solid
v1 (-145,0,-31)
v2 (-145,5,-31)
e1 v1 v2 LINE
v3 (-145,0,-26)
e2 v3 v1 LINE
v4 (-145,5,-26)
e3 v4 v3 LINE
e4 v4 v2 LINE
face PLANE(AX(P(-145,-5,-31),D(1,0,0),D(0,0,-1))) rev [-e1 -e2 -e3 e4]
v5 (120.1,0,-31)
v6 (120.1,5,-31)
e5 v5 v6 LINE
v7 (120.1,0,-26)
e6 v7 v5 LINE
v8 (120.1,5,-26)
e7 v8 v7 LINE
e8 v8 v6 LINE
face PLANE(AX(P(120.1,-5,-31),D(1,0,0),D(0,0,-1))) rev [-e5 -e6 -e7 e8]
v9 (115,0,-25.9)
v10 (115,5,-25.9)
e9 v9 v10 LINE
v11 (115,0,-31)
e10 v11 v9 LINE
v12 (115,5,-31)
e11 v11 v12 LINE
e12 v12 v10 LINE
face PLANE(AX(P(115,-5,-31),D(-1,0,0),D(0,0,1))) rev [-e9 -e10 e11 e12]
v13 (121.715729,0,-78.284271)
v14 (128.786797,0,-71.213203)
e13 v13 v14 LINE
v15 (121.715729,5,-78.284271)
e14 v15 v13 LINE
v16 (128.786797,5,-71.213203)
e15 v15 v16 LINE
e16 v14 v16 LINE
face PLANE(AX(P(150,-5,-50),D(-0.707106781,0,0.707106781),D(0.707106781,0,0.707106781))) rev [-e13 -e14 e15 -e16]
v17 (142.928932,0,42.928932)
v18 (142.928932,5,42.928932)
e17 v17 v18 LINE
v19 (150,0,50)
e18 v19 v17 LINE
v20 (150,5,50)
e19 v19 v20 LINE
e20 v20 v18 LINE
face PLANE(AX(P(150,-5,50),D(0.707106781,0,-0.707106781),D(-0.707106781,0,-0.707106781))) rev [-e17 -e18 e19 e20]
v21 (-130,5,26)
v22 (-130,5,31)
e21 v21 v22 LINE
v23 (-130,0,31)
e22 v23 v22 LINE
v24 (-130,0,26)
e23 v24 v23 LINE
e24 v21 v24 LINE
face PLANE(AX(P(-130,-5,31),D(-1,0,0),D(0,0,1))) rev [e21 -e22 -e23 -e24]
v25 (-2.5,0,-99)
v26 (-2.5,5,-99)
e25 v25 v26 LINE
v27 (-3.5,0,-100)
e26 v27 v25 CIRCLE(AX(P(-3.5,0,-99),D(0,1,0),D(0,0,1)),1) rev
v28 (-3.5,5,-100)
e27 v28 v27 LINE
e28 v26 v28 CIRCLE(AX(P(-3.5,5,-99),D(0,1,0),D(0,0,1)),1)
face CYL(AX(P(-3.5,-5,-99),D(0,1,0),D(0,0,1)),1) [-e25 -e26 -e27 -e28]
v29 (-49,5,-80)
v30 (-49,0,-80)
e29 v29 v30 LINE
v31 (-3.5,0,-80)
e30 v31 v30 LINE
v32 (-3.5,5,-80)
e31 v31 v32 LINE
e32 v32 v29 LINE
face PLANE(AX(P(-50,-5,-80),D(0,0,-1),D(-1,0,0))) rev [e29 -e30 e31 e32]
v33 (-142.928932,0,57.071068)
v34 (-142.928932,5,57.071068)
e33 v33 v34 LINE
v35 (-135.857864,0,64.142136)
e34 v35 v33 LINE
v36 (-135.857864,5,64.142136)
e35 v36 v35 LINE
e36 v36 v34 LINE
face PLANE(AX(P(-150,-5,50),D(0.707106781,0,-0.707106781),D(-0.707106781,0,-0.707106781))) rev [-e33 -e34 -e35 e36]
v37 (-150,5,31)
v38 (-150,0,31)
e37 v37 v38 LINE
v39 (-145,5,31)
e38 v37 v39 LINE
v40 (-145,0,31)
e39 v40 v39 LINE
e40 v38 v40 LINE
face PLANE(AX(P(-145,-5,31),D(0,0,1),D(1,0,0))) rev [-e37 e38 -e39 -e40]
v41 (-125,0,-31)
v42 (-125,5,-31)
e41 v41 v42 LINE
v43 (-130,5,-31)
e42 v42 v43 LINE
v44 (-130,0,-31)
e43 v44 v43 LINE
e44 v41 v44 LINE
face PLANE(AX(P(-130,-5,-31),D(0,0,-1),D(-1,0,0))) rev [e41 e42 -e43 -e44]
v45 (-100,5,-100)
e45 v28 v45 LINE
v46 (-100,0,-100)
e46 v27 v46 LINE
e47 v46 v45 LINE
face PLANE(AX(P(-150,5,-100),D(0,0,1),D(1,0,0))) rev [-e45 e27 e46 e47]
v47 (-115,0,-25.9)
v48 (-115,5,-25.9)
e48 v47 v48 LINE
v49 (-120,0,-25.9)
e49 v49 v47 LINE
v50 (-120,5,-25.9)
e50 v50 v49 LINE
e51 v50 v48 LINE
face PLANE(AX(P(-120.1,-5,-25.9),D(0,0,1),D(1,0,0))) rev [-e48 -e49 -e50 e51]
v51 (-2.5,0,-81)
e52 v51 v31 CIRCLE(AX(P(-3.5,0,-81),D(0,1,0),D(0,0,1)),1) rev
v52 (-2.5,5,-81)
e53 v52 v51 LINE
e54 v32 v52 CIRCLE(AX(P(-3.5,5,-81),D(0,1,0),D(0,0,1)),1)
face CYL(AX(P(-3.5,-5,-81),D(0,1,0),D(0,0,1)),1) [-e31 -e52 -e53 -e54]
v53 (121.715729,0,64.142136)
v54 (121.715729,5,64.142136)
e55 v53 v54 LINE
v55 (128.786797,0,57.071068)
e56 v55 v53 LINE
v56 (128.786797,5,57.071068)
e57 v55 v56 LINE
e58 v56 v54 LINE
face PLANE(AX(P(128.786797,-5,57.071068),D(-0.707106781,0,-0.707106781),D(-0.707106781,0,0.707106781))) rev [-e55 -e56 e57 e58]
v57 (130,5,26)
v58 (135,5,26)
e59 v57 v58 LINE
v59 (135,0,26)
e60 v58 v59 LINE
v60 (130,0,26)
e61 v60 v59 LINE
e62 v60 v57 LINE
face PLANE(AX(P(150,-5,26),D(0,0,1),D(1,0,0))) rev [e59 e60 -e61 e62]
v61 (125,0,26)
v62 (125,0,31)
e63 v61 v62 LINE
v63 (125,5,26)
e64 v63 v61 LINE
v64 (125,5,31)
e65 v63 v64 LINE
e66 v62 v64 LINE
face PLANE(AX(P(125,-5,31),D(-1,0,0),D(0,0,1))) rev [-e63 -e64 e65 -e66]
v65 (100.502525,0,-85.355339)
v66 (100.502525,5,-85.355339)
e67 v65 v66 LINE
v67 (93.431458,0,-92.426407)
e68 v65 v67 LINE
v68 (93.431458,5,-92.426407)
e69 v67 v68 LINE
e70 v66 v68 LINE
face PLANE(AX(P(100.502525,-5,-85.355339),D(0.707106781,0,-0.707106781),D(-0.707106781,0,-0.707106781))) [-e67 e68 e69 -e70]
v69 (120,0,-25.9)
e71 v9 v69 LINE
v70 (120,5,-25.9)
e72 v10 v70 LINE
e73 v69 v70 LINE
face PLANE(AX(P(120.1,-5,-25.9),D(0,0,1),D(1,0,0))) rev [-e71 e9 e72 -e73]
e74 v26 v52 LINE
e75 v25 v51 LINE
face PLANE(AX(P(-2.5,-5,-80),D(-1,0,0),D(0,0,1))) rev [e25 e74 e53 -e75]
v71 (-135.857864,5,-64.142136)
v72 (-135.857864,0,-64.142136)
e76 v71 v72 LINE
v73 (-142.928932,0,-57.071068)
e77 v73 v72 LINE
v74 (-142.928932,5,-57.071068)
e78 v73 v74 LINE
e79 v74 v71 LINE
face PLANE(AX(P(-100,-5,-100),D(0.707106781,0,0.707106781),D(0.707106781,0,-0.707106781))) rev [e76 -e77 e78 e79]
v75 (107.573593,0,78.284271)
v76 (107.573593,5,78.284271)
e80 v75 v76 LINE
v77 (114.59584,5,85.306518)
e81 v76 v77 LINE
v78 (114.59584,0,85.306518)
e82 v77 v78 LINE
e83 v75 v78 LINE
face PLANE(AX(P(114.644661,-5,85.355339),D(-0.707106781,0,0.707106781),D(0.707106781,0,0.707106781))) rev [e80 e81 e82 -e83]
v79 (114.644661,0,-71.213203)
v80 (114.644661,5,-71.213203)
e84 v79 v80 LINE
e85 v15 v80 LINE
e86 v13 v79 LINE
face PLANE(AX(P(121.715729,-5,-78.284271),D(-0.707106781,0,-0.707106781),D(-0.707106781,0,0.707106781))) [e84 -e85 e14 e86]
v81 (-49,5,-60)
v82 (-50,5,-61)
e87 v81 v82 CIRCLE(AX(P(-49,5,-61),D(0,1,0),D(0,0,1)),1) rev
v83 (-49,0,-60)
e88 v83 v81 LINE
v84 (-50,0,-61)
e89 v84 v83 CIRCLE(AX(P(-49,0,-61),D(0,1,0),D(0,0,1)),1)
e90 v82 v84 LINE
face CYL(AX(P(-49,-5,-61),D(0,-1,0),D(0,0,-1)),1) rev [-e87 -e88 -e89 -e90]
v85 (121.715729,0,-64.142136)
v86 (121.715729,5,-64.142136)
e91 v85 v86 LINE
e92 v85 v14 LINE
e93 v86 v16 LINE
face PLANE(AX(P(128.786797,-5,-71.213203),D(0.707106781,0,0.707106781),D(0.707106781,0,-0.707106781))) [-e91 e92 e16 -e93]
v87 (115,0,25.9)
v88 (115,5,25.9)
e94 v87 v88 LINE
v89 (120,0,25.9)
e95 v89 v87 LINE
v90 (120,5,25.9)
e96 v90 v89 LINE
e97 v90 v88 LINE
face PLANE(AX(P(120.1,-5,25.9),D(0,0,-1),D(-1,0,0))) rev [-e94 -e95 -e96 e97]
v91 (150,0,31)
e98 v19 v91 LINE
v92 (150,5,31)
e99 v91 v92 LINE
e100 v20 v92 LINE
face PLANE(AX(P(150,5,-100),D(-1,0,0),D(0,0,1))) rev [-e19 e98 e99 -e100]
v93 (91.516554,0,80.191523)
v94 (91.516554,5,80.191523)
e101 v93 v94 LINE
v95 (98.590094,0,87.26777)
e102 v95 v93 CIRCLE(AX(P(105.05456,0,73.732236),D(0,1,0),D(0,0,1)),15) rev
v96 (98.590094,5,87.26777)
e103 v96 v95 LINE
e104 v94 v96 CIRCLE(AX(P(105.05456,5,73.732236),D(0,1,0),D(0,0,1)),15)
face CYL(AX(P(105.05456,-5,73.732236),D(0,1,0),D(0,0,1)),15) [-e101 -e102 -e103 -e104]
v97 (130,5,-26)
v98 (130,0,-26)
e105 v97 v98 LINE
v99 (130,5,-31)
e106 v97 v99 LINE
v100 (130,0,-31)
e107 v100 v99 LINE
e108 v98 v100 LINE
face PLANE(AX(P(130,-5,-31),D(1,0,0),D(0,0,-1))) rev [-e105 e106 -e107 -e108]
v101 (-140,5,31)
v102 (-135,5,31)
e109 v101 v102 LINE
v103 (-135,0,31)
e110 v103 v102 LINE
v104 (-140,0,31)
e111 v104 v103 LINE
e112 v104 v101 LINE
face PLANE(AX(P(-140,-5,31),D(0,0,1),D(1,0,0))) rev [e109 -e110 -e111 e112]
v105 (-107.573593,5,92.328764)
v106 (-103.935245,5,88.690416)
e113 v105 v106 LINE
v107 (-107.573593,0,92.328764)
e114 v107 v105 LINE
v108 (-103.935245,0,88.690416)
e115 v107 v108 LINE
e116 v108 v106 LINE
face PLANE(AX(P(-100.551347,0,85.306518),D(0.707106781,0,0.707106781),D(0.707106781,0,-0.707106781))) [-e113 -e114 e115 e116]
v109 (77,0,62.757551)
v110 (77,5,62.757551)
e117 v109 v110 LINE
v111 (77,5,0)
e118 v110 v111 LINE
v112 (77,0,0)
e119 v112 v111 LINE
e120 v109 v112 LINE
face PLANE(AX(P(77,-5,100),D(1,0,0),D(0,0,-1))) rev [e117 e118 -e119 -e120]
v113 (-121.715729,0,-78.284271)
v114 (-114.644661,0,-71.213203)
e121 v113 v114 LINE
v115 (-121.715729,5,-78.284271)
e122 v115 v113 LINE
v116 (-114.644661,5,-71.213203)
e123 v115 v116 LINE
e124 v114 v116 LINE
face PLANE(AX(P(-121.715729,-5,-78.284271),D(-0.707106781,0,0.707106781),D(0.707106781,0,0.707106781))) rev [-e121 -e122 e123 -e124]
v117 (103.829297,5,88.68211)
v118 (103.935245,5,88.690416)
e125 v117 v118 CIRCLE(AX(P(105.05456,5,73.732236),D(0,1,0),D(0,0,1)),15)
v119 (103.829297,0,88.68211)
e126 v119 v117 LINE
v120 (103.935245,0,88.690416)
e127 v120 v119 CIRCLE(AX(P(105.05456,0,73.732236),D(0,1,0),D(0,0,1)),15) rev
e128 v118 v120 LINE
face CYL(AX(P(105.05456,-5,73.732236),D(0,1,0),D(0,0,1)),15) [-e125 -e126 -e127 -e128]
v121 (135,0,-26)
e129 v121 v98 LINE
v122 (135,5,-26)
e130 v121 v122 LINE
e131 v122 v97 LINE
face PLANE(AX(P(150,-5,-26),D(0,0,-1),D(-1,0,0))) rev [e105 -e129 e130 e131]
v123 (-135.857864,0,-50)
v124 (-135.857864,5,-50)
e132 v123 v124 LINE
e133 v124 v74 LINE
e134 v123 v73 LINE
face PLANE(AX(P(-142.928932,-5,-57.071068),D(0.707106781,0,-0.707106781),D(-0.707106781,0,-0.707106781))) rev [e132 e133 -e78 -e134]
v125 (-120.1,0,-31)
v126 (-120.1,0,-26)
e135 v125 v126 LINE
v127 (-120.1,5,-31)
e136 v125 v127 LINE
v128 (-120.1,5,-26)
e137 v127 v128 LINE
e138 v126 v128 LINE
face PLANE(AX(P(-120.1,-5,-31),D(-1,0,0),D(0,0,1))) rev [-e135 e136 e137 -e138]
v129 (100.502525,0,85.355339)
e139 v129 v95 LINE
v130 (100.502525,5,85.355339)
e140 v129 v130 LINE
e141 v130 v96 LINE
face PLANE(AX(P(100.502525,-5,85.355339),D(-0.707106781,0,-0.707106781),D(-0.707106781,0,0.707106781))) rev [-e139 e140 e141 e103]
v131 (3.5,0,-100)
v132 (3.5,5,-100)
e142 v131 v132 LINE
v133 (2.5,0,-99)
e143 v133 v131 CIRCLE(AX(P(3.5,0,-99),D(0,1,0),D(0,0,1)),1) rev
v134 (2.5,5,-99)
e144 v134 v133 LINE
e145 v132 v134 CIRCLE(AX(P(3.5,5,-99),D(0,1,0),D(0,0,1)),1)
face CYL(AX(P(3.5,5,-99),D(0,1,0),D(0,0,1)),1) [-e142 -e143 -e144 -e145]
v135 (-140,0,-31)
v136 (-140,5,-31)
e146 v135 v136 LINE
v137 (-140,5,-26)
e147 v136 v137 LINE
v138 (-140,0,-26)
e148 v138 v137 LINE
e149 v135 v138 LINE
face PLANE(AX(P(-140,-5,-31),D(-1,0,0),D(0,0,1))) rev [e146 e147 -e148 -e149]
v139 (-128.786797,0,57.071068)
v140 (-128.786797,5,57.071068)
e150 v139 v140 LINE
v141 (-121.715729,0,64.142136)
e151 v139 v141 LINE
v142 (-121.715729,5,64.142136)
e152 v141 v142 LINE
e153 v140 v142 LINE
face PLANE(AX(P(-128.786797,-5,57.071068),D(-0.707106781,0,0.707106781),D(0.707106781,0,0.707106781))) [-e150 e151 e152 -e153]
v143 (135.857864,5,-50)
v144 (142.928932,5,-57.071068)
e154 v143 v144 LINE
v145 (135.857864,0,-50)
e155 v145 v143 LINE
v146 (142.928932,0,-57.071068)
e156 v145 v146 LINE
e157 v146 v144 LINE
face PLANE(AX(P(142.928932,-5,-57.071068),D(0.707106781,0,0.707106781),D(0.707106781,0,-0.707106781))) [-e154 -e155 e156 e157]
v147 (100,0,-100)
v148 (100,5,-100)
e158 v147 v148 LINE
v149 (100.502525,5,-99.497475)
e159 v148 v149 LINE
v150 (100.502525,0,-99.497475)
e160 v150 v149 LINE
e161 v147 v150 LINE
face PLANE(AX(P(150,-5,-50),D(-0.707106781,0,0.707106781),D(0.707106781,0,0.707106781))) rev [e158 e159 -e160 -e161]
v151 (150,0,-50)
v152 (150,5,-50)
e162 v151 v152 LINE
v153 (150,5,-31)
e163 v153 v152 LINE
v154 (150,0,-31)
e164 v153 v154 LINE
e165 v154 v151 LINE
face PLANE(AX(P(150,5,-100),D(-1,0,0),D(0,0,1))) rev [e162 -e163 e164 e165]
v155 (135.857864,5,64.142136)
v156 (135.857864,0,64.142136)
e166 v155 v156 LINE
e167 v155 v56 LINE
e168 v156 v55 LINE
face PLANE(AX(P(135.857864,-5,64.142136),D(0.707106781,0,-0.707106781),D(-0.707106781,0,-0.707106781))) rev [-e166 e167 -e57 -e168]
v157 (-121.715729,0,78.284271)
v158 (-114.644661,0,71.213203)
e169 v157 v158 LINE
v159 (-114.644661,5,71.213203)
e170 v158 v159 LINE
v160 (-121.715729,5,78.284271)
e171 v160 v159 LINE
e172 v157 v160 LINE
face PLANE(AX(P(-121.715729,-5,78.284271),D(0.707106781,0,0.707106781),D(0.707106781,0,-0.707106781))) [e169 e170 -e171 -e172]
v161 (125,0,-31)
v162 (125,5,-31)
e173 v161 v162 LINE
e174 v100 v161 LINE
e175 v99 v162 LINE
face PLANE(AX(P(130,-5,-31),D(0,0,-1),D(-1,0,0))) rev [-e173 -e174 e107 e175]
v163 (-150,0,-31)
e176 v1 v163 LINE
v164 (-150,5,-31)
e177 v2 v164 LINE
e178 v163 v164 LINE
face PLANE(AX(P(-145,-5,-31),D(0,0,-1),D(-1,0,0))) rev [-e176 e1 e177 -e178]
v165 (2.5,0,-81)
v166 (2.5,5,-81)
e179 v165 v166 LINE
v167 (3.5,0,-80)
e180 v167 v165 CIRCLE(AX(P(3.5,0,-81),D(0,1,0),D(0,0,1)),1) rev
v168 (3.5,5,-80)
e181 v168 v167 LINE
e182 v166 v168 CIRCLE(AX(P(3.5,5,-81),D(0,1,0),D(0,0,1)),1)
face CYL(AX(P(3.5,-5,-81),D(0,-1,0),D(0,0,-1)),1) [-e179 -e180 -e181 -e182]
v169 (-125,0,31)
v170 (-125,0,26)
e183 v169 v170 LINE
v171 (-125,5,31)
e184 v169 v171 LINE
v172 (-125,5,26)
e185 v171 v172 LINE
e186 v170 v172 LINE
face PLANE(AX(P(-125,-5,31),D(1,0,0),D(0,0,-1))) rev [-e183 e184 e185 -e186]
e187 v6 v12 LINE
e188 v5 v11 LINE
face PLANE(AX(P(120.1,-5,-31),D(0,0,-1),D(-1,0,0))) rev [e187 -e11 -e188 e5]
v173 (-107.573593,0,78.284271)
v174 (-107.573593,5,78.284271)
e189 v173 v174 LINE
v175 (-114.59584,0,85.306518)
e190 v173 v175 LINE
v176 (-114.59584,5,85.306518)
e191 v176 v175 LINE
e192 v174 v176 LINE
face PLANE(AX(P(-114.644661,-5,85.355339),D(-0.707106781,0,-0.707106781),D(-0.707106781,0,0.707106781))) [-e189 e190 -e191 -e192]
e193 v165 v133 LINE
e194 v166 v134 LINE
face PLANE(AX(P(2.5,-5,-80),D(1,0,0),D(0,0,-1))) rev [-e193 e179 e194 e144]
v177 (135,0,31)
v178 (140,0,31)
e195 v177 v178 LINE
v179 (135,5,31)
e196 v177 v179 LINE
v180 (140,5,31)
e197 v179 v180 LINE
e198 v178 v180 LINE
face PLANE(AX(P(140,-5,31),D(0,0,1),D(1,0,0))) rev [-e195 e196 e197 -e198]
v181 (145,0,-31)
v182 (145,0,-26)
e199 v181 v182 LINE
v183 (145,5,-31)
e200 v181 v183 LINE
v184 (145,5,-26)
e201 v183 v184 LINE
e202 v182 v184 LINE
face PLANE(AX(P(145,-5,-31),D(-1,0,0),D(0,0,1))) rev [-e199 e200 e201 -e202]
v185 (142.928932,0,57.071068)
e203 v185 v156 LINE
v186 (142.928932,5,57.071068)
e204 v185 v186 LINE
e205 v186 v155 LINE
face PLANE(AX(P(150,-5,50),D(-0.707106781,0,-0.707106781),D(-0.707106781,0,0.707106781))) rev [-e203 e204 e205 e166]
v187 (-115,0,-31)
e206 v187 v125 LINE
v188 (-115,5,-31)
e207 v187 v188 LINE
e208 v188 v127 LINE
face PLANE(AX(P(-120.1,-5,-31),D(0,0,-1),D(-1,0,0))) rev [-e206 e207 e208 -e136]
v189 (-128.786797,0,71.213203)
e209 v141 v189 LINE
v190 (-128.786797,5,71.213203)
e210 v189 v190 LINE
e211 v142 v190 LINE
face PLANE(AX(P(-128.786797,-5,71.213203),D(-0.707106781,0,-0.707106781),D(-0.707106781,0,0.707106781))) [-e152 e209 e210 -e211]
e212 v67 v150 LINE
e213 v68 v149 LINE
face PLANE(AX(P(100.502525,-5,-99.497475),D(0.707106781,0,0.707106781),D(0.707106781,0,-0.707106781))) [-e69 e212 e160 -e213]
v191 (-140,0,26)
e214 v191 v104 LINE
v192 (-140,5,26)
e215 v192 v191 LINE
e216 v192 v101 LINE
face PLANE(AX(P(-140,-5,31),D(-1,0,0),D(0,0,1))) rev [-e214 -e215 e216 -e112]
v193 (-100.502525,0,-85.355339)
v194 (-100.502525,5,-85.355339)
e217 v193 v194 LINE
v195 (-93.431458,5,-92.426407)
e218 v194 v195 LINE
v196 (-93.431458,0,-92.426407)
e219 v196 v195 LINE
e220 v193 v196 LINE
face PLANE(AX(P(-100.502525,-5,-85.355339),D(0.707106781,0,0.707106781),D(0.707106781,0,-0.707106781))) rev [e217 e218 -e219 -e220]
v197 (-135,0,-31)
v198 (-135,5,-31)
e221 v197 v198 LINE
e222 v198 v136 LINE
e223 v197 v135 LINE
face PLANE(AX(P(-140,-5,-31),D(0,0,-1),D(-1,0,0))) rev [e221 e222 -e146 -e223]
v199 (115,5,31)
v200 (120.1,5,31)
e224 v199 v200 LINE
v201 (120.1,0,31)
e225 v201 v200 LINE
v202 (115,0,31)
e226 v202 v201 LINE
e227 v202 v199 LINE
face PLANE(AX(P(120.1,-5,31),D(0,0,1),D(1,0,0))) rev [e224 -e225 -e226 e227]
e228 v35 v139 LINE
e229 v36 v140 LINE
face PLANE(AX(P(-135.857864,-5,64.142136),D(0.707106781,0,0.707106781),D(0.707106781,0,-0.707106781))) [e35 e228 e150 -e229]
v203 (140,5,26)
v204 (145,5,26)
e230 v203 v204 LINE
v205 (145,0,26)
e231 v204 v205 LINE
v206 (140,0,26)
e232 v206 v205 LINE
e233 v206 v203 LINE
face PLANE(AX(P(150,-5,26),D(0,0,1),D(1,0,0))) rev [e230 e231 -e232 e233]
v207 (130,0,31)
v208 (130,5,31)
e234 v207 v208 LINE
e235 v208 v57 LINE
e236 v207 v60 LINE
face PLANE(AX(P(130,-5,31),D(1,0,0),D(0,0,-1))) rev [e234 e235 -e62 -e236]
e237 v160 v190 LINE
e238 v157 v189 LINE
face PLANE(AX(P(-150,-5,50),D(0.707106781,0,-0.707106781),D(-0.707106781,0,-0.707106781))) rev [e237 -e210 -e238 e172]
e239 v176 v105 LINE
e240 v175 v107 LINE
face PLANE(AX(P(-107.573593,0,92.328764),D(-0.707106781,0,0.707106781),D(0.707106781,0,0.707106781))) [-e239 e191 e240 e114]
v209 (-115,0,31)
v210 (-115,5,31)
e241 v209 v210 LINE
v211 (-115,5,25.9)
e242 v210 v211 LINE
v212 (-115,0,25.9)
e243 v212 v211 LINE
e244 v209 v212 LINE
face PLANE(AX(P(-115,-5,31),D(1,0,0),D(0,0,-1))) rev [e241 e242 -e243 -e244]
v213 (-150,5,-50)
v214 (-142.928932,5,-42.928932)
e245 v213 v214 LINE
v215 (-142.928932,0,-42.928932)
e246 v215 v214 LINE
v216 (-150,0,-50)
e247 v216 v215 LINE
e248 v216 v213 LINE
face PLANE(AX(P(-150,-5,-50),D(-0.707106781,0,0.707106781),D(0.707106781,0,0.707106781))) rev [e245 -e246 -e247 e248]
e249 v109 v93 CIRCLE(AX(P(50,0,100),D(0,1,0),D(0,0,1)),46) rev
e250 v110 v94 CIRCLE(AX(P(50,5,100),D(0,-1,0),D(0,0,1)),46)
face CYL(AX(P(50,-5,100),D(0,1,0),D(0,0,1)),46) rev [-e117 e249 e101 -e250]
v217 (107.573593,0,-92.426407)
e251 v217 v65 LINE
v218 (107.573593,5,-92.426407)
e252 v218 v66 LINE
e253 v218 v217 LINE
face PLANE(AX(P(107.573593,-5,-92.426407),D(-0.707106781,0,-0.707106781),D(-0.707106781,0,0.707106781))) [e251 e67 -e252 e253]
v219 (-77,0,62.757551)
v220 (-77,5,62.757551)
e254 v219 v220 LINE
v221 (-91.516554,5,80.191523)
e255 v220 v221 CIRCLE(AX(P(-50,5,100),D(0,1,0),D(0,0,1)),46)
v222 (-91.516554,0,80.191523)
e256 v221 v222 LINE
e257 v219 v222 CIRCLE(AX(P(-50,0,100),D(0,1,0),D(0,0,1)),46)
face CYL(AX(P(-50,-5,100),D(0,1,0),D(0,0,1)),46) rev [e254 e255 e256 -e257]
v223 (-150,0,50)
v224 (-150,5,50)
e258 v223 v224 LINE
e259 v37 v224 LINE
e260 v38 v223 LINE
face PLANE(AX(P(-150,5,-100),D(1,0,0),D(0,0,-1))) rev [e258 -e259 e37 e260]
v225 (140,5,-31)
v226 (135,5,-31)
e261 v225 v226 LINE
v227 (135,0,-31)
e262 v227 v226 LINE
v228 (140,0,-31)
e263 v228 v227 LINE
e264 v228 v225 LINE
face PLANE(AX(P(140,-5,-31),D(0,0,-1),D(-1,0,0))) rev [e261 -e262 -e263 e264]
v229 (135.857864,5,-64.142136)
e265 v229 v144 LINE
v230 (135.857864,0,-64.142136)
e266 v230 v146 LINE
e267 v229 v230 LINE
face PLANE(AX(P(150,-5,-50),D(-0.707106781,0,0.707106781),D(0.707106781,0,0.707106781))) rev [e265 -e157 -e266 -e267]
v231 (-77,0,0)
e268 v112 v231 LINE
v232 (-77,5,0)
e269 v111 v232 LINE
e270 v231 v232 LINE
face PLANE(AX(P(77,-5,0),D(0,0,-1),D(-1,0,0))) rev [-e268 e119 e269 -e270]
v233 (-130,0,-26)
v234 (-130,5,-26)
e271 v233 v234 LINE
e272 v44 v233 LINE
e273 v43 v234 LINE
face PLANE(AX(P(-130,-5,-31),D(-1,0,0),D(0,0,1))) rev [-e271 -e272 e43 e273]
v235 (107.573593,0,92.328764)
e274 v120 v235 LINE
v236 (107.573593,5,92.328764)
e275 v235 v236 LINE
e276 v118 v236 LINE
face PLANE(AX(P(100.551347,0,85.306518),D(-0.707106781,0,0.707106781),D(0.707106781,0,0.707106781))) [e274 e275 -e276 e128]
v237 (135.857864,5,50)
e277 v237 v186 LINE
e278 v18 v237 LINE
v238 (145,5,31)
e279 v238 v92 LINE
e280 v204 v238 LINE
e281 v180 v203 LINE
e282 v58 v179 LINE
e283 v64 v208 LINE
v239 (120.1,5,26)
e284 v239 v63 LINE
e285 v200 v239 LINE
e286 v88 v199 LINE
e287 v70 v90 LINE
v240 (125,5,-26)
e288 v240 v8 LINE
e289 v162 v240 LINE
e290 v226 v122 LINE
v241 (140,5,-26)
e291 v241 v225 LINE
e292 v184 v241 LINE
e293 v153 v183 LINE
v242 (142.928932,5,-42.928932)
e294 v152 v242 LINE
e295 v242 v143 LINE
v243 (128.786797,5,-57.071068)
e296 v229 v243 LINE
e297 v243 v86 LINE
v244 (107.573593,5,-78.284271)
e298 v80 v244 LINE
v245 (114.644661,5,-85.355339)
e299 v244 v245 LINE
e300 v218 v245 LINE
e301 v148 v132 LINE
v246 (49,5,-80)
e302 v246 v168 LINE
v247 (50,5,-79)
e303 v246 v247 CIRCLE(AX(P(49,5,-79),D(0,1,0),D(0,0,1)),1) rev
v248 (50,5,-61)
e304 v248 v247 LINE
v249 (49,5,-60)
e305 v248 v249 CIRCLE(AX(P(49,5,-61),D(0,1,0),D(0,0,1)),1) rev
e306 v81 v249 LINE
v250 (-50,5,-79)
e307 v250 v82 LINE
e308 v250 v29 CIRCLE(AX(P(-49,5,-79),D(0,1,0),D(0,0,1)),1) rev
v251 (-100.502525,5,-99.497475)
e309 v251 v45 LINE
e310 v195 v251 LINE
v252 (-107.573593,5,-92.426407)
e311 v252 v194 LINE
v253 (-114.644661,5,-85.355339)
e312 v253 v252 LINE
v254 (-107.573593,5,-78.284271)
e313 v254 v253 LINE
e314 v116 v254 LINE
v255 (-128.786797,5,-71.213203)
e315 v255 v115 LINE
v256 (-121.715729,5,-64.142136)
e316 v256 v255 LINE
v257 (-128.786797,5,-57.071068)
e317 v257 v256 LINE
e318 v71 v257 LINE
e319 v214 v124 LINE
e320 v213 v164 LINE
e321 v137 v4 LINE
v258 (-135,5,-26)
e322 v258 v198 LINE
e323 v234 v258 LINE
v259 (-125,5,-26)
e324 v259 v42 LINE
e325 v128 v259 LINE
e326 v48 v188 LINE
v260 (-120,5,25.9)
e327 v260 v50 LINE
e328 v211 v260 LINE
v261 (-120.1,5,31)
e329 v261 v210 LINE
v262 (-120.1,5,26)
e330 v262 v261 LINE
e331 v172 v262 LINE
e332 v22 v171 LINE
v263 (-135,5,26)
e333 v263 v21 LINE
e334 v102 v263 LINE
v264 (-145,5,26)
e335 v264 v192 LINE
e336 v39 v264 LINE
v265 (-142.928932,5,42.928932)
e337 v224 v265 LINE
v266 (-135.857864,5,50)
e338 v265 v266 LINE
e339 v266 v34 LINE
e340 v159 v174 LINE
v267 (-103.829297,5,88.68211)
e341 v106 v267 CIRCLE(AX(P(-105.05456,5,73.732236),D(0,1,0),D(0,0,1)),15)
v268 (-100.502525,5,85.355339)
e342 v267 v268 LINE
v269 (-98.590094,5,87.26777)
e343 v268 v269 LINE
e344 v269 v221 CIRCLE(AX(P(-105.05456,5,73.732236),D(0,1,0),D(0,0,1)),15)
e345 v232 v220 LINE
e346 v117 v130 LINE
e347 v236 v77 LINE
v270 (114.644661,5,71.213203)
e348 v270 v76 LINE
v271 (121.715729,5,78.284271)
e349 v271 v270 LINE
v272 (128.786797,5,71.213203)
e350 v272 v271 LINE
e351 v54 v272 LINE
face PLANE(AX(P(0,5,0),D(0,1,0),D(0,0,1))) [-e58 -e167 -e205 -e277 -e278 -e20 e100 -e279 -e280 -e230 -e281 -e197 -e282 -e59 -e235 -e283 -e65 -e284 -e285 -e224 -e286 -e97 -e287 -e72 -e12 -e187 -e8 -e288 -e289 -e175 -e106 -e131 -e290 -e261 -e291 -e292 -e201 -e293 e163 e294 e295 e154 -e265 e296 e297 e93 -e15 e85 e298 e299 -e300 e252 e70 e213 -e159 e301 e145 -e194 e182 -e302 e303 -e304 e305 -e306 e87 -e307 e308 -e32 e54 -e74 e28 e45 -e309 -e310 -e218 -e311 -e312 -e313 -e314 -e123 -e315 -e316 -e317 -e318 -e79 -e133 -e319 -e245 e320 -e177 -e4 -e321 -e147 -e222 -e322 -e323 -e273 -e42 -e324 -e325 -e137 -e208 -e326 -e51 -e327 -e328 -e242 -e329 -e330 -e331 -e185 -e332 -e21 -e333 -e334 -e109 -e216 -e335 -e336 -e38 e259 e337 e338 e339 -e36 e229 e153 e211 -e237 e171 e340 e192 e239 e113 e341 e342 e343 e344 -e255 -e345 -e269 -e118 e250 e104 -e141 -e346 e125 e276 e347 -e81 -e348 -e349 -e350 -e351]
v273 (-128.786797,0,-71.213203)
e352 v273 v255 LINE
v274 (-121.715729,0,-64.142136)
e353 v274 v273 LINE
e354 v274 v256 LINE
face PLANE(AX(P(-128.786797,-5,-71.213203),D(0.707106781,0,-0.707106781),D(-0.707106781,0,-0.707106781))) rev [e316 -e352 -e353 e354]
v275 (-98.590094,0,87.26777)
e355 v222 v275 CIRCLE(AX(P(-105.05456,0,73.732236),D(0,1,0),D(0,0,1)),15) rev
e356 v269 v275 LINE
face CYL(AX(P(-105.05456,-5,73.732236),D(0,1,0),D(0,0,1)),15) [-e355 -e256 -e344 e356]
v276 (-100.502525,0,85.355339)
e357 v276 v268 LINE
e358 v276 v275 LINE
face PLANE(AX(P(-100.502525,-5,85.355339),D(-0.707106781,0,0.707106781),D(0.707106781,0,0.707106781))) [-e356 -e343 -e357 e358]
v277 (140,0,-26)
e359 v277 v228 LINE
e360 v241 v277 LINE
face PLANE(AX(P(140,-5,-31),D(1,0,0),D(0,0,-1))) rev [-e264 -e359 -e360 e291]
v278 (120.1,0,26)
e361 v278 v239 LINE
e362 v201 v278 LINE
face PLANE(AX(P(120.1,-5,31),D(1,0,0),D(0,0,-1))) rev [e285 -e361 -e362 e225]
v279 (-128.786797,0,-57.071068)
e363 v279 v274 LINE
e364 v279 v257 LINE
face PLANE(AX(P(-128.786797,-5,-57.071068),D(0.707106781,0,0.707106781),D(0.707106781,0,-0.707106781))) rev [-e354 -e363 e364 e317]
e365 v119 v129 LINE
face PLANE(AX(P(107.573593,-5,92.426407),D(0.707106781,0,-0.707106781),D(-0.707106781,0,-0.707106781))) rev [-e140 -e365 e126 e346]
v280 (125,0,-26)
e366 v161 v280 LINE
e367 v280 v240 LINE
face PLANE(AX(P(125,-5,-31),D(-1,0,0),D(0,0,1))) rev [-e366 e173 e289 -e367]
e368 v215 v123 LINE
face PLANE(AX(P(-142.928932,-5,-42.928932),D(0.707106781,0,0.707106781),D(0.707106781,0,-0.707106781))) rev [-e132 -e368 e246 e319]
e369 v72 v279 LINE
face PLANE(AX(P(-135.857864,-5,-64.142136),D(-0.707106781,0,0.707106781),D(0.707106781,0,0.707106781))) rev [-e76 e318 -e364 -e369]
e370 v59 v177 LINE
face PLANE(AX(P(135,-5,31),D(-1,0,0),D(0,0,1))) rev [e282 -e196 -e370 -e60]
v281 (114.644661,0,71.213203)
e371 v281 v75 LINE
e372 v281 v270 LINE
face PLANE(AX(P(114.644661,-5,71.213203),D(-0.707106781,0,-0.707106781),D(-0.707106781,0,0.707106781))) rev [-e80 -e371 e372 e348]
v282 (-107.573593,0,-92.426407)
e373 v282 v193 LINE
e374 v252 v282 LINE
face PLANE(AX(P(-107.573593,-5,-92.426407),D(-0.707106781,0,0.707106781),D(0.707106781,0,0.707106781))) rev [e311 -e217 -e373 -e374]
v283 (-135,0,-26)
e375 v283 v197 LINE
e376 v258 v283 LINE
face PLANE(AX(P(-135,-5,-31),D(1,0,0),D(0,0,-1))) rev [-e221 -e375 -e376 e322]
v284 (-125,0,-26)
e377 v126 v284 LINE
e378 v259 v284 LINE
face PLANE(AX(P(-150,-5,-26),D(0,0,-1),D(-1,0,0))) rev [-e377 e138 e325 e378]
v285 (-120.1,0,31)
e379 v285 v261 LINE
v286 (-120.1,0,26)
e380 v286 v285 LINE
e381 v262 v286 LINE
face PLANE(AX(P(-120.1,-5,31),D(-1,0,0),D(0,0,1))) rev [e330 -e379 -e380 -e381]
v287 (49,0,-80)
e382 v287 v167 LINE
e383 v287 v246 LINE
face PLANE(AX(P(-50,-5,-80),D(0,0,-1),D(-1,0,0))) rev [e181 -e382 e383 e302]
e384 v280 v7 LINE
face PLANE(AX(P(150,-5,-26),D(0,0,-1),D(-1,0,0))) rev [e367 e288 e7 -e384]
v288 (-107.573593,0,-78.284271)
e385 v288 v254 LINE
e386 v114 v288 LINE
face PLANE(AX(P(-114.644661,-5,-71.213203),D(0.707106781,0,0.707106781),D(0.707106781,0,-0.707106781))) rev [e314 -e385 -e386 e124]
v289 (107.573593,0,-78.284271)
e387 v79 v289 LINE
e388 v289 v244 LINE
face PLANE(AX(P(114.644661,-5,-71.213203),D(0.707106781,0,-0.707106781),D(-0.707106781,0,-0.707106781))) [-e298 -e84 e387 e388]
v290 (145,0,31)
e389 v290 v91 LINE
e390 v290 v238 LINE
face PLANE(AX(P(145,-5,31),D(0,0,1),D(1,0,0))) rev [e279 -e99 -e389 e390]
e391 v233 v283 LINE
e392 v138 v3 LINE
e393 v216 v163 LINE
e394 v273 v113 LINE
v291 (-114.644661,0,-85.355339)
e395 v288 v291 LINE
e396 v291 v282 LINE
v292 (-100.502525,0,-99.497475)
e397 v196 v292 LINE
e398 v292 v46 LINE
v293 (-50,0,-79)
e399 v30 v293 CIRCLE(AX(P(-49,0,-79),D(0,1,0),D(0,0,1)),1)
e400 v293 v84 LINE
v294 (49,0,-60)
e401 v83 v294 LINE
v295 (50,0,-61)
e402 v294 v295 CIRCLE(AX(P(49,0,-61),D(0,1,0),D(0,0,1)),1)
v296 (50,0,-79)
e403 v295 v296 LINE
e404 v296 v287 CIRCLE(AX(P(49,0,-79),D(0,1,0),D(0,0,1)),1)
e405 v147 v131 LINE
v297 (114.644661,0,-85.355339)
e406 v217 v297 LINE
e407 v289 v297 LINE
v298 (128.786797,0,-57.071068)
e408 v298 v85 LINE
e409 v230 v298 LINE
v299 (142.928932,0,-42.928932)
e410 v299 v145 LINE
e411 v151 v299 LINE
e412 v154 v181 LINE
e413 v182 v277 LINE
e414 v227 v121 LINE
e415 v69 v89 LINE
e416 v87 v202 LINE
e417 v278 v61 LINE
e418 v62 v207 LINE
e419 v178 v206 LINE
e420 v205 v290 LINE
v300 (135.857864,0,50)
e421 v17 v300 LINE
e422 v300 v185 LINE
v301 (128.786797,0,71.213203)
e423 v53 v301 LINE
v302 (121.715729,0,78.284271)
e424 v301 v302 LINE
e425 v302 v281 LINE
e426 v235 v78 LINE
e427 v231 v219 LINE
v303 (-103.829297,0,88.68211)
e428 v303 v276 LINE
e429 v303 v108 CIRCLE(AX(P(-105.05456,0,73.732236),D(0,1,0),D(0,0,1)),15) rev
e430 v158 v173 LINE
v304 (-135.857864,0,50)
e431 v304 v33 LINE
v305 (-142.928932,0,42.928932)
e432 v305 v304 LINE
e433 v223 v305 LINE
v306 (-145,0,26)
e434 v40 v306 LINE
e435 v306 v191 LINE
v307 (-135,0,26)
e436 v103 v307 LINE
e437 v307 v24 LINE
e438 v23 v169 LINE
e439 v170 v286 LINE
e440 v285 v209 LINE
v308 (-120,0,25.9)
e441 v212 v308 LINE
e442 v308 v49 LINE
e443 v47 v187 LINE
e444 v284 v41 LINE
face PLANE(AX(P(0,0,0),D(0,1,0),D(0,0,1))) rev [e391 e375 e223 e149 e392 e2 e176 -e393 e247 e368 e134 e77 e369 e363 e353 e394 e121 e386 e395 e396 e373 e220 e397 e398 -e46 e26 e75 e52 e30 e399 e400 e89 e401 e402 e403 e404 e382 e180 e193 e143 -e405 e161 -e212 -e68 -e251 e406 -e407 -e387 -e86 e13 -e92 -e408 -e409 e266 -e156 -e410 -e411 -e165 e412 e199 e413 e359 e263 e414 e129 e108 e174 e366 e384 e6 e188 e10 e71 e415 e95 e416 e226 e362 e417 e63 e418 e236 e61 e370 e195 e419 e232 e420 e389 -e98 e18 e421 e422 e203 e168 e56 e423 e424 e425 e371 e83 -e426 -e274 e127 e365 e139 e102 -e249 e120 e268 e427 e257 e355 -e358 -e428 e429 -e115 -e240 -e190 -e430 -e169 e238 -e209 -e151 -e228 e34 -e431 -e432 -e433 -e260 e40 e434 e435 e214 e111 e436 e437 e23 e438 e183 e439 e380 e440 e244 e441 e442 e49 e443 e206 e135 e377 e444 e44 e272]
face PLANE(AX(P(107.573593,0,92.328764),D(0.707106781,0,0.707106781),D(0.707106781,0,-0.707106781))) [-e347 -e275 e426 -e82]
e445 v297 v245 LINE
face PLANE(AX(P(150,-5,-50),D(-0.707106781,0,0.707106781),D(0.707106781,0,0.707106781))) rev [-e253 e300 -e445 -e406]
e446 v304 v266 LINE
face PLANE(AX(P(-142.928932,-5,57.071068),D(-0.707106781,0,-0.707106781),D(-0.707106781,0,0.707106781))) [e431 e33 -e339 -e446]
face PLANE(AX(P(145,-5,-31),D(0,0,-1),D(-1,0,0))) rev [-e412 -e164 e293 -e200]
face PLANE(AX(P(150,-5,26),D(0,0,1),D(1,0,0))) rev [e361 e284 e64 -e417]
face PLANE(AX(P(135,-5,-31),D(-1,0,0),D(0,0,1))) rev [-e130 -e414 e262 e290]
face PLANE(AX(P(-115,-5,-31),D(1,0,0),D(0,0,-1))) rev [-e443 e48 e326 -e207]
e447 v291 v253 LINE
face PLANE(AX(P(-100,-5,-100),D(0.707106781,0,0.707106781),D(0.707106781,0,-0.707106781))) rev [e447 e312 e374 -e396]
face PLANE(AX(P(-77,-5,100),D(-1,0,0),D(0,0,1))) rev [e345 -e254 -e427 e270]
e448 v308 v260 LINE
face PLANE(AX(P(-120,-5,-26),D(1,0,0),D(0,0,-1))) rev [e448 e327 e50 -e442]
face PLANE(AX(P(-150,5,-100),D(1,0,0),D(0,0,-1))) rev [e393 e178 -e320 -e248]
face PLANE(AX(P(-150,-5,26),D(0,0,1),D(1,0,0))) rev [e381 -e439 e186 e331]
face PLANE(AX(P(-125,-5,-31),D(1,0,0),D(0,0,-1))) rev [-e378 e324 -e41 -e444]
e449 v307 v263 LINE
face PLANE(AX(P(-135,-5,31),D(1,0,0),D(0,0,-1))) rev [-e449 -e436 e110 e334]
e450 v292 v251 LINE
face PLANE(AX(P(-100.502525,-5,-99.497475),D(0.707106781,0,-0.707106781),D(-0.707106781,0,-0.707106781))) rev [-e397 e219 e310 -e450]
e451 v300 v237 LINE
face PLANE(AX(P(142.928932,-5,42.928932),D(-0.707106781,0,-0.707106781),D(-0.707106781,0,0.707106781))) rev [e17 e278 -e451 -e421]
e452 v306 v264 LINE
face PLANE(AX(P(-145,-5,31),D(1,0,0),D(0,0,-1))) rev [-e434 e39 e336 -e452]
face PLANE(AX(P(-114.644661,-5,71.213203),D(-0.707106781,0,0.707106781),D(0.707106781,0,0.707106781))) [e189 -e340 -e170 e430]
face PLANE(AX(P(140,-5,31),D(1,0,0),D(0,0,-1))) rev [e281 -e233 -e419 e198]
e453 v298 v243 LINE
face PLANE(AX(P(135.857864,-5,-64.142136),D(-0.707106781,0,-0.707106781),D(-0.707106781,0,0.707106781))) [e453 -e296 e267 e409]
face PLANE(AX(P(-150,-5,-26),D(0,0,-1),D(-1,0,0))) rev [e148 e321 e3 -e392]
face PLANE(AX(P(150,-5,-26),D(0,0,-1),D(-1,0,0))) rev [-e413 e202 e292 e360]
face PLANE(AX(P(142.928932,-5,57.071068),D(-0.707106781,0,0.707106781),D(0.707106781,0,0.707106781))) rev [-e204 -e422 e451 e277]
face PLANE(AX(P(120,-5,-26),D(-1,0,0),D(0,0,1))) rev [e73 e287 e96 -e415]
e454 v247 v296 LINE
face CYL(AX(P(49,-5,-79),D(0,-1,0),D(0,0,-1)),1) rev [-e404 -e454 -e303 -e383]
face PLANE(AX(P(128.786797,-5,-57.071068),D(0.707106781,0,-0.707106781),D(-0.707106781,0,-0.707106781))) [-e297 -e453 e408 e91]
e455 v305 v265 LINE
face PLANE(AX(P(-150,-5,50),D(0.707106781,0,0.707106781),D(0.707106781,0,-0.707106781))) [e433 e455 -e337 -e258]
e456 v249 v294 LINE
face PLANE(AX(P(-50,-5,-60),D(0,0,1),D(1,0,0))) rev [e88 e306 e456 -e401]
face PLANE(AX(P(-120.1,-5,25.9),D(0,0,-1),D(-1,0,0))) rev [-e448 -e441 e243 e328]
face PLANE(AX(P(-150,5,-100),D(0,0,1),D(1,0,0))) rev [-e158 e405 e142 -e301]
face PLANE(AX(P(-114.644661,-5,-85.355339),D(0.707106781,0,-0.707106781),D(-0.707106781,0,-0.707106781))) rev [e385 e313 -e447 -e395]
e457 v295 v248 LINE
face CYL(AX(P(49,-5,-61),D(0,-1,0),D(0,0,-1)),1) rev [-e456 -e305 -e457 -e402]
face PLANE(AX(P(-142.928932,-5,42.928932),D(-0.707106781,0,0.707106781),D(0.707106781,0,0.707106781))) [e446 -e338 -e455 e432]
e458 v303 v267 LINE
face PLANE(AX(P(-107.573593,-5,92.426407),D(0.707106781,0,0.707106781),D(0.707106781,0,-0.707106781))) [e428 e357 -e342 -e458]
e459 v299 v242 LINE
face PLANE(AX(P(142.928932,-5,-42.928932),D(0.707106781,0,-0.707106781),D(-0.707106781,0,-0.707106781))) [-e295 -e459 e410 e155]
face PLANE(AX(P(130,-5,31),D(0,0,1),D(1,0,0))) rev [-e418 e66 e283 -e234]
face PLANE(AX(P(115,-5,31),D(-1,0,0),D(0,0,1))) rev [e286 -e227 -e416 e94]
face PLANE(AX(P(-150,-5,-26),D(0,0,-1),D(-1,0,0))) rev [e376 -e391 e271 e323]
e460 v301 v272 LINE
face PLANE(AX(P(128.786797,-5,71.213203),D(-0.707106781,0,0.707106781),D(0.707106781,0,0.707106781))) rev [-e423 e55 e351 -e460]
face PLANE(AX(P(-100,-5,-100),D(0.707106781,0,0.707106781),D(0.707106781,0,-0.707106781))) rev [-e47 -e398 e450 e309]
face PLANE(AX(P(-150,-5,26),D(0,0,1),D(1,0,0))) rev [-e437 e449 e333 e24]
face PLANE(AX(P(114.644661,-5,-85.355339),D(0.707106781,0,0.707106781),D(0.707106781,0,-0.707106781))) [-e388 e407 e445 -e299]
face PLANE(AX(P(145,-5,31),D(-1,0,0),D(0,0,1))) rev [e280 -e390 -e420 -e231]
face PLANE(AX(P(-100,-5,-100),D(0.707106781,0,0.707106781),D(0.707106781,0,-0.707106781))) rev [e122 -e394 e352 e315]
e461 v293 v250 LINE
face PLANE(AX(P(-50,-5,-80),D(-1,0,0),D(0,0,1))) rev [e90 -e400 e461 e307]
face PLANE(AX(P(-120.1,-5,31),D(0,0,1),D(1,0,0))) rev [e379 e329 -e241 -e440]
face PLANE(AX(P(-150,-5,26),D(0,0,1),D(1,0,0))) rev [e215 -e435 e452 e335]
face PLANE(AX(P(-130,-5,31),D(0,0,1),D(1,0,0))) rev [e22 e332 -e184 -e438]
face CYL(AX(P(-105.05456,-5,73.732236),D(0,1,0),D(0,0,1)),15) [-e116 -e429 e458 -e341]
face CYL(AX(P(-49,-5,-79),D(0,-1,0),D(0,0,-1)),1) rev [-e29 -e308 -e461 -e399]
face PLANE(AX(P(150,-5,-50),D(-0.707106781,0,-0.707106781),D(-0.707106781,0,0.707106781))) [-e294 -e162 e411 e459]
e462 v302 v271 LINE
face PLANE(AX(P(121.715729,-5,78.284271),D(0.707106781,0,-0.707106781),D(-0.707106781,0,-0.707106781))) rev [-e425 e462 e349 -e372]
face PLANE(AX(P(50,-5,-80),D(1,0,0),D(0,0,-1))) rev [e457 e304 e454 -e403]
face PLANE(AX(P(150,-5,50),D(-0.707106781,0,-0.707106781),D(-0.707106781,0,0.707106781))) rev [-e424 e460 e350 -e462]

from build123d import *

# Parameters (mm, degrees)
ESQUISSE1_W                = 300
ESQUISSE1_H                = 200
BOSS_EXTRU_1_DEPTH         = 5
ENL_V_MAT_EXTRU_1_DEPTH    = 10
ESQUISSE10_R               = 46
ENL_V_MAT_EXTRU_9_DEPTH    = 10
CONG_2_R                   = 15
CONG_3_R                   = 15
ENL_V_MAT_EXTRU_10_DEPTH   = 10
R_P_TITION_LIN_AIRE1_COUNT = 4
R_P_TITION_LIN_AIRE1_PITCH = 20
SYM_TRIE3_COPY_1_DEPTH     = 10
SYM_TRIE3_COPY_2_DEPTH     = 10
SYM_TRIE3_COPY_3_DEPTH     = 10
SYM_TRIE4_COPY_1_DEPTH     = 10
SYM_TRIE4_COPY_2_DEPTH     = 10
SYM_TRIE4_COPY_3_DEPTH     = 10
SYM_TRIE4_COPY_4_DEPTH     = 10
SYM_TRIE4_COPY_5_DEPTH     = 10
SYM_TRIE4_COPY_6_DEPTH     = 10
SYM_TRIE4_COPY_7_DEPTH     = 10
ESQUISSE16_W               = 154
ESQUISSE16_H               = 100
ENL_V_MAT_EXTRU_15_DEPTH   = 10
ESQUISSE24_W               = 30
ESQUISSE24_H               = 52
ENL_V_MAT_EXTRU_18_DEPTH   = 10
ESQUISSE25_W               = 5.1
ESQUISSE25_H               = 5.1
ESQUISSE25_W_2             = 5
ENL_V_MAT_EXTRU_21_DEPTH   = 10
ESQUISSE26_W               = 100
ESQUISSE26_H               = 20
ENL_V_MAT_EXTRU_22_DEPTH   = 10
ESQUISSE27_W               = 5
ESQUISSE27_H               = 20
ENL_V_MAT_EXTRU_23_DEPTH   = 10
CONG_4_R                   = 1
BOSS_EXTRU_2_DEPTH         = 5


with BuildPart() as part:
    # Esquisse1 → Boss.-Extru.1 (new body)
    with BuildSketch(Plane(origin=(0, 0, 0), x_dir=(1, 0, 0), z_dir=(0, 1, 0))):
        Rectangle(ESQUISSE1_W, ESQUISSE1_H)
    extrude(amount=BOSS_EXTRU_1_DEPTH)

    # Esquisse2 → Enlèv. mat.-Extru.1 (cut)
    with BuildSketch(Plane(origin=(0, 5, 0), x_dir=(1, 0, 0), z_dir=(0, 1, 0))):
        Polygon((-100, 100), (-150, 50), (-150, 100), align=None)
        Polygon((150, 100), (150, 50), (100, 100), align=None)
        Polygon((150, -100), (150, -50), (100, -100), align=None)
        Polygon((-100, -100), (-150, -100), (-150, -50), align=None)
    extrude(amount=-ENL_V_MAT_EXTRU_1_DEPTH, mode=Mode.SUBTRACT)

    # Esquisse10 → Enlèv. mat.-Extru.9 (cut)
    with BuildSketch(Plane(origin=(0, 5, 0), x_dir=(1, 0, 0), z_dir=(0, 1, 0))):
        with Locations((-50, -100)):
            Circle(ESQUISSE10_R)
    enl_v_mat_extru_9 = extrude(amount=-ENL_V_MAT_EXTRU_9_DEPTH, mode=Mode.SUBTRACT)

    # Symétrie2: Enlèv. mat.-Extru.9 across plane
    add(enl_v_mat_extru_9.mirror(Plane(origin=(0, 0, 0), x_dir=(0, 0, 1), z_dir=(1, 0, 0))), mode=Mode.SUBTRACT)

    # Congé2
    # the kernel refuses this fillet: 15 mm, written as the material it takes off along each edge
    with BuildSketch(Plane(origin=(96, -21.235602644, 100), x_dir=(-0.09232870714969725, 0, -0.9957285824139354), z_dir=(0, 1, 0))) as cong_2_piece_1:
        with BuildLine():
            CenterArc((9.879171665, -14.935928736), CONG_2_R, 95.297590138, 37.799165941)
            Line((-0.369314829, -3.98291433), (-0.574284558, -3.763854042))
            ThreePointArc((-0.574284558, -3.763854042), (-0.483375989, -1.963758553), (-0.298718575, 0.027698612))
            Line((-0.298718575, 0.027698612), (0.027698612, 0.298718575))
            ThreePointArc((0.027698612, 0.298718575), (4.247120529, 0.103514791), (8.466542446, 0.298718575))
            Line((8.466542446, 0.298718575), (8.494241058, 0))
        make_face()
    extrude(amount=47.471205289, mode=Mode.SUBTRACT)
    with BuildSketch(Plane(origin=(-4, 31.582289094, 100), x_dir=(-0.11557516997606784, 0, -0.9932987365767678), z_dir=(0, -1, 0))) as cong_2_piece_2:
        with BuildLine():
            CenterArc((12.366543187, 14.899481049), CONG_2_R, 207.615736088, 55.747462838)
            Line((-0.92460136, 7.946389893), (-1.190424251, 7.807328069))
            ThreePointArc((-1.190424251, 7.807328069), (-0.760290301, 3.938522395), (-0.297989621, -0.034672551))
            Line((-0.297989621, -0.034672551), (0.034672551, -0.297989621))
            ThreePointArc((0.034672551, -0.297989621), (5.316457819, 0.008258117), (10.598243087, -0.297989621))
            Line((10.598243087, -0.297989621), (10.632915638, 0))
        make_face()
    extrude(amount=58.164578189, mode=Mode.SUBTRACT)
    with BuildSketch(Plane(origin=(-96, -21.235602644, 100), x_dir=(-1, 0, 0), z_dir=(0, 1, 0))) as cong_2_piece_3:
        with BuildLine():
            CenterArc((13.96, -11.215988588), CONG_2_R, 131.605653784, 37.799165941)
            Line((-0.784262295, -8.457958607), (-1.079147541, -8.402798008))
            ThreePointArc((-1.079147541, -8.402798008), (-0.495203784, -4.219421917), (-0.3, 0))
            Line((-0.3, 0), (0, 0.3))
            ThreePointArc((0, 0.3), (2, 0.3), (3.8008, 0.224319772))
            Line((3.8008, 0.224319772), (4, 0))
        make_face()
    extrude(amount=47.471205289, mode=Mode.SUBTRACT)

    # Congé3
    # the kernel refuses this fillet: 15 mm, written as the material it takes off along each edge
    with BuildSketch(Plane(origin=(4, 82.454375783, 100), x_dir=(-0.5259574363156356, 0, -0.8505108906911681), z_dir=(0, -1, 0))) as cong_3_piece_1:
        with BuildLine():
            CenterArc((31.823070558, 14.976387423), CONG_3_R, 156.680733503, 110.10397256)
            Line((18.048370731, 20.91420223), (16.670900749, 21.507983711))
            ThreePointArc((16.670900749, 21.507983711), (9.495651399, 10.050239134), (-0.788936154, 1.275766336))
            Line((-0.788936154, 1.275766336), (-0.908739865, -1.193395097))
            ThreePointArc((-0.908739865, -1.193395097), (14.311759275, -3.717121073), (30.897618289, -1.497638742))
            Line((30.897618289, -1.497638742), (30.981750313, 0))
        make_face()
    extrude(amount=159.908751565, mode=Mode.SUBTRACT)
    with BuildSketch(Plane(origin=(100, 60.370568853, 100), x_dir=(-0.393687931749037, 0, -0.9192441527663723), z_dir=(0, -1, 0))) as cong_3_piece_2:
        with BuildLine():
            CenterArc((22.15656876, 14.987676404), CONG_3_R, 158.18416882, 109.493145359)
            Line((8.230821057, 20.56204192), (6.838246287, 21.119478472))
            Line((6.838246287, 21.119478472), (-1.39257477, 0.557436552))
            Line((-1.39257477, 0.557436552), (-0.638910013, -1.357127111))
            ThreePointArc((-0.638910013, -1.357127111), (9.985368841, -2.532046911), (21.487866451, -1.49876764))
            Line((21.487866451, -1.49876764), (21.54865757, 0))
        make_face()
    extrude(amount=115.741137706, mode=Mode.SUBTRACT)
    with BuildSketch(Plane(origin=(-100, 60.370568853, 100), x_dir=(-0.7071067811865478, 0, -0.7071067811865471), z_dir=(0, -1, 0))) as cong_3_piece_3:
        with BuildLine():
            CenterArc((22.148227541, 15), CONG_3_R, 160.506854641, 109.493145359)
            Line((8.008006246, 20.005411244), (6.593984116, 20.505952369))
            ThreePointArc((6.593984116, 20.505952369), (1.360096619, 10.211218813), (-1.497368513, -0.088811805))
            Line((-1.497368513, -0.088811805), (0, -1.5))
            Line((0, -1.5), (22.148227541, -1.5))
            Line((22.148227541, -1.5), (22.148227541, 0))
        make_face()
    extrude(amount=115.741137706, mode=Mode.SUBTRACT)

    # Esquisse11 → Enlèv. mat.-Extru.10 (cut)
    with BuildSketch(Plane(origin=(0, 5, 0), x_dir=(1, 0, 0), z_dir=(0, 1, 0))):
        Polygon((-150, 50), (-142.928932188, 57.071067812), (-135.857864376, 50), (-142.928932188, 42.928932188), align=None)
    enl_v_mat_extru_10 = extrude(amount=-ENL_V_MAT_EXTRU_10_DEPTH, mode=Mode.SUBTRACT)

    # Répétition linéaire1: Enlèv. mat.-Extru.10 ×4
    with Locations(*[Vector(0.7071067811865476, 0, -0.7071067811865476) * (i * R_P_TITION_LIN_AIRE1_PITCH) for i in range(1, R_P_TITION_LIN_AIRE1_COUNT)]):
        add(enl_v_mat_extru_10, mode=Mode.SUBTRACT)

    # Symétrie3: Enlèv. mat.-Extru.10 across plane
    add(enl_v_mat_extru_10.mirror(Plane.XY), mode=Mode.SUBTRACT)

    # Symétrie3 copy 1 sketch → Symétrie3 copy 1 (cut)
    with BuildSketch(Plane(origin=(14.142135624, 5, 14.142135624), x_dir=(1, 0, 0), z_dir=(0, 1, 0))):
        Polygon((-150, -50), (-142.928932188, -57.071067812), (-135.857864376, -50), (-142.928932188, -42.928932188), align=None)
    extrude(amount=-SYM_TRIE3_COPY_1_DEPTH, mode=Mode.SUBTRACT)

    # Symétrie3 copy 2 sketch → Symétrie3 copy 2 (cut)
    with BuildSketch(Plane(origin=(28.284271247, 5, 28.284271247), x_dir=(1, 0, 0), z_dir=(0, 1, 0))):
        Polygon((-150, -50), (-142.928932188, -57.071067812), (-135.857864376, -50), (-142.928932188, -42.928932188), align=None)
    extrude(amount=-SYM_TRIE3_COPY_2_DEPTH, mode=Mode.SUBTRACT)

    # Symétrie3 copy 3 sketch → Symétrie3 copy 3 (cut)
    with BuildSketch(Plane(origin=(42.426406871, 5, 42.426406871), x_dir=(1, 0, 0), z_dir=(0, 1, 0))):
        Polygon((-150, -50), (-142.928932188, -57.071067812), (-135.857864376, -50), (-142.928932188, -42.928932188), align=None)
    extrude(amount=-SYM_TRIE3_COPY_3_DEPTH, mode=Mode.SUBTRACT)

    # Symétrie4: Enlèv. mat.-Extru.10 across plane
    add(enl_v_mat_extru_10.mirror(Plane(origin=(0, 0, 0), x_dir=(0, 0, 1), z_dir=(1, 0, 0))), mode=Mode.SUBTRACT)

    # Symétrie4 copy 1 sketch → Symétrie4 copy 1 (cut)
    with BuildSketch(Plane(origin=(-14.142135624, 5, -14.142135624), x_dir=(-1, 0, 0), z_dir=(0, 1, 0))):
        Polygon((-150, -50), (-142.928932188, -57.071067812), (-135.857864376, -50), (-142.928932188, -42.928932188), align=None)
    extrude(amount=-SYM_TRIE4_COPY_1_DEPTH, mode=Mode.SUBTRACT)

    # Symétrie4 copy 2 sketch → Symétrie4 copy 2 (cut)
    with BuildSketch(Plane(origin=(-28.284271247, 5, -28.284271247), x_dir=(-1, 0, 0), z_dir=(0, 1, 0))):
        Polygon((-150, -50), (-142.928932188, -57.071067812), (-135.857864376, -50), (-142.928932188, -42.928932188), align=None)
    extrude(amount=-SYM_TRIE4_COPY_2_DEPTH, mode=Mode.SUBTRACT)

    # Symétrie4 copy 3 sketch → Symétrie4 copy 3 (cut)
    with BuildSketch(Plane(origin=(-42.426406871, 5, -42.426406871), x_dir=(-1, 0, 0), z_dir=(0, 1, 0))):
        Polygon((-150, -50), (-142.928932188, -57.071067812), (-135.857864376, -50), (-142.928932188, -42.928932188), align=None)
    extrude(amount=-SYM_TRIE4_COPY_3_DEPTH, mode=Mode.SUBTRACT)

    # Symétrie4 copy 4 sketch → Symétrie4 copy 4 (cut)
    with BuildSketch(Plane(origin=(0, 5, 0), x_dir=(-1, 0, 0), z_dir=(0, 1, 0))):
        Polygon((-150, 50), (-142.928932188, 57.071067812), (-135.857864376, 50), (-142.928932188, 42.928932188), align=None)
    extrude(amount=-SYM_TRIE4_COPY_4_DEPTH, mode=Mode.SUBTRACT)

    # Symétrie4 copy 5 sketch → Symétrie4 copy 5 (cut)
    with BuildSketch(Plane(origin=(-14.142135624, 5, 14.142135624), x_dir=(-1, 0, 0), z_dir=(0, 1, 0))):
        Polygon((-150, 50), (-142.928932188, 57.071067812), (-135.857864376, 50), (-142.928932188, 42.928932188), align=None)
    extrude(amount=-SYM_TRIE4_COPY_5_DEPTH, mode=Mode.SUBTRACT)

    # Symétrie4 copy 6 sketch → Symétrie4 copy 6 (cut)
    with BuildSketch(Plane(origin=(-28.284271247, 5, 28.284271247), x_dir=(-1, 0, 0), z_dir=(0, 1, 0))):
        Polygon((-150, 50), (-142.928932188, 57.071067812), (-135.857864376, 50), (-142.928932188, 42.928932188), align=None)
    extrude(amount=-SYM_TRIE4_COPY_6_DEPTH, mode=Mode.SUBTRACT)

    # Symétrie4 copy 7 sketch → Symétrie4 copy 7 (cut)
    with BuildSketch(Plane(origin=(-42.426406871, 5, 42.426406871), x_dir=(-1, 0, 0), z_dir=(0, 1, 0))):
        Polygon((-150, 50), (-142.928932188, 57.071067812), (-135.857864376, 50), (-142.928932188, 42.928932188), align=None)
    extrude(amount=-SYM_TRIE4_COPY_7_DEPTH, mode=Mode.SUBTRACT)

    # Esquisse16 → Enlèv. mat.-Extru.15 (cut)
    with BuildSketch(Plane(origin=(0, 5, 0), x_dir=(1, 0, 0), z_dir=(0, 1, 0))):
        with Locations((0, -50)):
            Rectangle(ESQUISSE16_W, ESQUISSE16_H)
    extrude(amount=-ENL_V_MAT_EXTRU_15_DEPTH, mode=Mode.SUBTRACT)

    # Esquisse24 → Enlèv. mat.-Extru.18 (cut)
    with BuildSketch(Plane(origin=(0, 5, 0), x_dir=(1, 0, 0), z_dir=(0, 1, 0))):
        with Locations((-135, 0)):
            Rectangle(ESQUISSE24_W, ESQUISSE24_H)
        with Locations((135, 0)):
            Rectangle(ESQUISSE24_W, ESQUISSE24_H)
    extrude(amount=-ENL_V_MAT_EXTRU_18_DEPTH, mode=Mode.SUBTRACT)

    # Esquisse25 → Enlèv. mat.-Extru.21 (cut)
    with BuildSketch(Plane(origin=(0, 5, 0), x_dir=(1, 0, 0), z_dir=(0, 1, 0))):
        with Locations((-147.55, 28.45)):
            Rectangle(ESQUISSE25_W, ESQUISSE25_H)
        with Locations((-127.5, 28.45)):
            Rectangle(ESQUISSE25_W_2, ESQUISSE25_H)
        with Locations((-137.5, 28.45)):
            Rectangle(ESQUISSE25_W_2, ESQUISSE25_H)
        with Locations((-117.55, 28.45)):
            Rectangle(ESQUISSE25_W, ESQUISSE25_H)
        with Locations((-117.55, -28.45)):
            Rectangle(ESQUISSE25_W, ESQUISSE25_H)
        with Locations((-127.5, -28.45)):
            Rectangle(ESQUISSE25_W_2, ESQUISSE25_H)
        with Locations((-137.5, -28.45)):
            Rectangle(ESQUISSE25_W_2, ESQUISSE25_H)
        with Locations((-147.55, -28.45)):
            Rectangle(ESQUISSE25_W, ESQUISSE25_H)
        with Locations((147.55, -28.45)):
            Rectangle(ESQUISSE25_W, ESQUISSE25_H)
        with Locations((127.5, -28.45)):
            Rectangle(ESQUISSE25_W_2, ESQUISSE25_H)
        with Locations((137.5, -28.45)):
            Rectangle(ESQUISSE25_W_2, ESQUISSE25_H)
        with Locations((117.55, -28.45)):
            Rectangle(ESQUISSE25_W, ESQUISSE25_H)
        with Locations((117.55, 28.45)):
            Rectangle(ESQUISSE25_W, ESQUISSE25_H)
        with Locations((127.5, 28.45)):
            Rectangle(ESQUISSE25_W_2, ESQUISSE25_H)
        with Locations((137.5, 28.45)):
            Rectangle(ESQUISSE25_W_2, ESQUISSE25_H)
        with Locations((147.55, 28.45)):
            Rectangle(ESQUISSE25_W, ESQUISSE25_H)
    extrude(amount=-ENL_V_MAT_EXTRU_21_DEPTH, mode=Mode.SUBTRACT)

    # Esquisse26 → Enlèv. mat.-Extru.22 (cut)
    with BuildSketch(Plane(origin=(0, 5, 0), x_dir=(1, 0, 0), z_dir=(0, 1, 0))):
        with Locations((0, 70)):
            Rectangle(ESQUISSE26_W, ESQUISSE26_H)
    extrude(amount=-ENL_V_MAT_EXTRU_22_DEPTH, mode=Mode.SUBTRACT)

    # Esquisse27 → Enlèv. mat.-Extru.23 (cut)
    with BuildSketch(Plane(origin=(0, 5, 0), x_dir=(1, 0, 0), z_dir=(0, 1, 0))):
        with Locations((0, 90)):
            Rectangle(ESQUISSE27_W, ESQUISSE27_H)
    extrude(amount=-ENL_V_MAT_EXTRU_23_DEPTH, mode=Mode.SUBTRACT)

    # Congé4
    cong_4_edges = [part.edges().sort_by_distance(p)[0] for p in [
        (-50, 2.5, -60),
        (-50, 2.5, -80),
        (50, 2.5, -80),
        (50, 2.5, -60),
        (-2.5, 2.5, -80),
        (2.5, 2.5, -80),
        (-2.5, 2.5, -100),
        (2.5, 2.5, -100),
    ]]
    fillet(cong_4_edges, radius=CONG_4_R)

    # Esquisse28 → Boss.-Extru.2 (add)
    with BuildSketch(Plane(origin=(0, 5, 0), x_dir=(1, 0, 0), z_dir=(0, 1, 0))):
        Polygon((107.573593129, -78.284271247), (114.595839569, -85.306517687), (107.573593129, -92.328764127), (100.551346689, -85.306517687), align=None)
        Polygon((-107.573593129, -92.328764127), (-114.595839569, -85.306517687), (-107.573593129, -78.284271247), (-100.551346689, -85.306517687), align=None)
    extrude(amount=-BOSS_EXTRU_2_DEPTH)


solid = part.part
